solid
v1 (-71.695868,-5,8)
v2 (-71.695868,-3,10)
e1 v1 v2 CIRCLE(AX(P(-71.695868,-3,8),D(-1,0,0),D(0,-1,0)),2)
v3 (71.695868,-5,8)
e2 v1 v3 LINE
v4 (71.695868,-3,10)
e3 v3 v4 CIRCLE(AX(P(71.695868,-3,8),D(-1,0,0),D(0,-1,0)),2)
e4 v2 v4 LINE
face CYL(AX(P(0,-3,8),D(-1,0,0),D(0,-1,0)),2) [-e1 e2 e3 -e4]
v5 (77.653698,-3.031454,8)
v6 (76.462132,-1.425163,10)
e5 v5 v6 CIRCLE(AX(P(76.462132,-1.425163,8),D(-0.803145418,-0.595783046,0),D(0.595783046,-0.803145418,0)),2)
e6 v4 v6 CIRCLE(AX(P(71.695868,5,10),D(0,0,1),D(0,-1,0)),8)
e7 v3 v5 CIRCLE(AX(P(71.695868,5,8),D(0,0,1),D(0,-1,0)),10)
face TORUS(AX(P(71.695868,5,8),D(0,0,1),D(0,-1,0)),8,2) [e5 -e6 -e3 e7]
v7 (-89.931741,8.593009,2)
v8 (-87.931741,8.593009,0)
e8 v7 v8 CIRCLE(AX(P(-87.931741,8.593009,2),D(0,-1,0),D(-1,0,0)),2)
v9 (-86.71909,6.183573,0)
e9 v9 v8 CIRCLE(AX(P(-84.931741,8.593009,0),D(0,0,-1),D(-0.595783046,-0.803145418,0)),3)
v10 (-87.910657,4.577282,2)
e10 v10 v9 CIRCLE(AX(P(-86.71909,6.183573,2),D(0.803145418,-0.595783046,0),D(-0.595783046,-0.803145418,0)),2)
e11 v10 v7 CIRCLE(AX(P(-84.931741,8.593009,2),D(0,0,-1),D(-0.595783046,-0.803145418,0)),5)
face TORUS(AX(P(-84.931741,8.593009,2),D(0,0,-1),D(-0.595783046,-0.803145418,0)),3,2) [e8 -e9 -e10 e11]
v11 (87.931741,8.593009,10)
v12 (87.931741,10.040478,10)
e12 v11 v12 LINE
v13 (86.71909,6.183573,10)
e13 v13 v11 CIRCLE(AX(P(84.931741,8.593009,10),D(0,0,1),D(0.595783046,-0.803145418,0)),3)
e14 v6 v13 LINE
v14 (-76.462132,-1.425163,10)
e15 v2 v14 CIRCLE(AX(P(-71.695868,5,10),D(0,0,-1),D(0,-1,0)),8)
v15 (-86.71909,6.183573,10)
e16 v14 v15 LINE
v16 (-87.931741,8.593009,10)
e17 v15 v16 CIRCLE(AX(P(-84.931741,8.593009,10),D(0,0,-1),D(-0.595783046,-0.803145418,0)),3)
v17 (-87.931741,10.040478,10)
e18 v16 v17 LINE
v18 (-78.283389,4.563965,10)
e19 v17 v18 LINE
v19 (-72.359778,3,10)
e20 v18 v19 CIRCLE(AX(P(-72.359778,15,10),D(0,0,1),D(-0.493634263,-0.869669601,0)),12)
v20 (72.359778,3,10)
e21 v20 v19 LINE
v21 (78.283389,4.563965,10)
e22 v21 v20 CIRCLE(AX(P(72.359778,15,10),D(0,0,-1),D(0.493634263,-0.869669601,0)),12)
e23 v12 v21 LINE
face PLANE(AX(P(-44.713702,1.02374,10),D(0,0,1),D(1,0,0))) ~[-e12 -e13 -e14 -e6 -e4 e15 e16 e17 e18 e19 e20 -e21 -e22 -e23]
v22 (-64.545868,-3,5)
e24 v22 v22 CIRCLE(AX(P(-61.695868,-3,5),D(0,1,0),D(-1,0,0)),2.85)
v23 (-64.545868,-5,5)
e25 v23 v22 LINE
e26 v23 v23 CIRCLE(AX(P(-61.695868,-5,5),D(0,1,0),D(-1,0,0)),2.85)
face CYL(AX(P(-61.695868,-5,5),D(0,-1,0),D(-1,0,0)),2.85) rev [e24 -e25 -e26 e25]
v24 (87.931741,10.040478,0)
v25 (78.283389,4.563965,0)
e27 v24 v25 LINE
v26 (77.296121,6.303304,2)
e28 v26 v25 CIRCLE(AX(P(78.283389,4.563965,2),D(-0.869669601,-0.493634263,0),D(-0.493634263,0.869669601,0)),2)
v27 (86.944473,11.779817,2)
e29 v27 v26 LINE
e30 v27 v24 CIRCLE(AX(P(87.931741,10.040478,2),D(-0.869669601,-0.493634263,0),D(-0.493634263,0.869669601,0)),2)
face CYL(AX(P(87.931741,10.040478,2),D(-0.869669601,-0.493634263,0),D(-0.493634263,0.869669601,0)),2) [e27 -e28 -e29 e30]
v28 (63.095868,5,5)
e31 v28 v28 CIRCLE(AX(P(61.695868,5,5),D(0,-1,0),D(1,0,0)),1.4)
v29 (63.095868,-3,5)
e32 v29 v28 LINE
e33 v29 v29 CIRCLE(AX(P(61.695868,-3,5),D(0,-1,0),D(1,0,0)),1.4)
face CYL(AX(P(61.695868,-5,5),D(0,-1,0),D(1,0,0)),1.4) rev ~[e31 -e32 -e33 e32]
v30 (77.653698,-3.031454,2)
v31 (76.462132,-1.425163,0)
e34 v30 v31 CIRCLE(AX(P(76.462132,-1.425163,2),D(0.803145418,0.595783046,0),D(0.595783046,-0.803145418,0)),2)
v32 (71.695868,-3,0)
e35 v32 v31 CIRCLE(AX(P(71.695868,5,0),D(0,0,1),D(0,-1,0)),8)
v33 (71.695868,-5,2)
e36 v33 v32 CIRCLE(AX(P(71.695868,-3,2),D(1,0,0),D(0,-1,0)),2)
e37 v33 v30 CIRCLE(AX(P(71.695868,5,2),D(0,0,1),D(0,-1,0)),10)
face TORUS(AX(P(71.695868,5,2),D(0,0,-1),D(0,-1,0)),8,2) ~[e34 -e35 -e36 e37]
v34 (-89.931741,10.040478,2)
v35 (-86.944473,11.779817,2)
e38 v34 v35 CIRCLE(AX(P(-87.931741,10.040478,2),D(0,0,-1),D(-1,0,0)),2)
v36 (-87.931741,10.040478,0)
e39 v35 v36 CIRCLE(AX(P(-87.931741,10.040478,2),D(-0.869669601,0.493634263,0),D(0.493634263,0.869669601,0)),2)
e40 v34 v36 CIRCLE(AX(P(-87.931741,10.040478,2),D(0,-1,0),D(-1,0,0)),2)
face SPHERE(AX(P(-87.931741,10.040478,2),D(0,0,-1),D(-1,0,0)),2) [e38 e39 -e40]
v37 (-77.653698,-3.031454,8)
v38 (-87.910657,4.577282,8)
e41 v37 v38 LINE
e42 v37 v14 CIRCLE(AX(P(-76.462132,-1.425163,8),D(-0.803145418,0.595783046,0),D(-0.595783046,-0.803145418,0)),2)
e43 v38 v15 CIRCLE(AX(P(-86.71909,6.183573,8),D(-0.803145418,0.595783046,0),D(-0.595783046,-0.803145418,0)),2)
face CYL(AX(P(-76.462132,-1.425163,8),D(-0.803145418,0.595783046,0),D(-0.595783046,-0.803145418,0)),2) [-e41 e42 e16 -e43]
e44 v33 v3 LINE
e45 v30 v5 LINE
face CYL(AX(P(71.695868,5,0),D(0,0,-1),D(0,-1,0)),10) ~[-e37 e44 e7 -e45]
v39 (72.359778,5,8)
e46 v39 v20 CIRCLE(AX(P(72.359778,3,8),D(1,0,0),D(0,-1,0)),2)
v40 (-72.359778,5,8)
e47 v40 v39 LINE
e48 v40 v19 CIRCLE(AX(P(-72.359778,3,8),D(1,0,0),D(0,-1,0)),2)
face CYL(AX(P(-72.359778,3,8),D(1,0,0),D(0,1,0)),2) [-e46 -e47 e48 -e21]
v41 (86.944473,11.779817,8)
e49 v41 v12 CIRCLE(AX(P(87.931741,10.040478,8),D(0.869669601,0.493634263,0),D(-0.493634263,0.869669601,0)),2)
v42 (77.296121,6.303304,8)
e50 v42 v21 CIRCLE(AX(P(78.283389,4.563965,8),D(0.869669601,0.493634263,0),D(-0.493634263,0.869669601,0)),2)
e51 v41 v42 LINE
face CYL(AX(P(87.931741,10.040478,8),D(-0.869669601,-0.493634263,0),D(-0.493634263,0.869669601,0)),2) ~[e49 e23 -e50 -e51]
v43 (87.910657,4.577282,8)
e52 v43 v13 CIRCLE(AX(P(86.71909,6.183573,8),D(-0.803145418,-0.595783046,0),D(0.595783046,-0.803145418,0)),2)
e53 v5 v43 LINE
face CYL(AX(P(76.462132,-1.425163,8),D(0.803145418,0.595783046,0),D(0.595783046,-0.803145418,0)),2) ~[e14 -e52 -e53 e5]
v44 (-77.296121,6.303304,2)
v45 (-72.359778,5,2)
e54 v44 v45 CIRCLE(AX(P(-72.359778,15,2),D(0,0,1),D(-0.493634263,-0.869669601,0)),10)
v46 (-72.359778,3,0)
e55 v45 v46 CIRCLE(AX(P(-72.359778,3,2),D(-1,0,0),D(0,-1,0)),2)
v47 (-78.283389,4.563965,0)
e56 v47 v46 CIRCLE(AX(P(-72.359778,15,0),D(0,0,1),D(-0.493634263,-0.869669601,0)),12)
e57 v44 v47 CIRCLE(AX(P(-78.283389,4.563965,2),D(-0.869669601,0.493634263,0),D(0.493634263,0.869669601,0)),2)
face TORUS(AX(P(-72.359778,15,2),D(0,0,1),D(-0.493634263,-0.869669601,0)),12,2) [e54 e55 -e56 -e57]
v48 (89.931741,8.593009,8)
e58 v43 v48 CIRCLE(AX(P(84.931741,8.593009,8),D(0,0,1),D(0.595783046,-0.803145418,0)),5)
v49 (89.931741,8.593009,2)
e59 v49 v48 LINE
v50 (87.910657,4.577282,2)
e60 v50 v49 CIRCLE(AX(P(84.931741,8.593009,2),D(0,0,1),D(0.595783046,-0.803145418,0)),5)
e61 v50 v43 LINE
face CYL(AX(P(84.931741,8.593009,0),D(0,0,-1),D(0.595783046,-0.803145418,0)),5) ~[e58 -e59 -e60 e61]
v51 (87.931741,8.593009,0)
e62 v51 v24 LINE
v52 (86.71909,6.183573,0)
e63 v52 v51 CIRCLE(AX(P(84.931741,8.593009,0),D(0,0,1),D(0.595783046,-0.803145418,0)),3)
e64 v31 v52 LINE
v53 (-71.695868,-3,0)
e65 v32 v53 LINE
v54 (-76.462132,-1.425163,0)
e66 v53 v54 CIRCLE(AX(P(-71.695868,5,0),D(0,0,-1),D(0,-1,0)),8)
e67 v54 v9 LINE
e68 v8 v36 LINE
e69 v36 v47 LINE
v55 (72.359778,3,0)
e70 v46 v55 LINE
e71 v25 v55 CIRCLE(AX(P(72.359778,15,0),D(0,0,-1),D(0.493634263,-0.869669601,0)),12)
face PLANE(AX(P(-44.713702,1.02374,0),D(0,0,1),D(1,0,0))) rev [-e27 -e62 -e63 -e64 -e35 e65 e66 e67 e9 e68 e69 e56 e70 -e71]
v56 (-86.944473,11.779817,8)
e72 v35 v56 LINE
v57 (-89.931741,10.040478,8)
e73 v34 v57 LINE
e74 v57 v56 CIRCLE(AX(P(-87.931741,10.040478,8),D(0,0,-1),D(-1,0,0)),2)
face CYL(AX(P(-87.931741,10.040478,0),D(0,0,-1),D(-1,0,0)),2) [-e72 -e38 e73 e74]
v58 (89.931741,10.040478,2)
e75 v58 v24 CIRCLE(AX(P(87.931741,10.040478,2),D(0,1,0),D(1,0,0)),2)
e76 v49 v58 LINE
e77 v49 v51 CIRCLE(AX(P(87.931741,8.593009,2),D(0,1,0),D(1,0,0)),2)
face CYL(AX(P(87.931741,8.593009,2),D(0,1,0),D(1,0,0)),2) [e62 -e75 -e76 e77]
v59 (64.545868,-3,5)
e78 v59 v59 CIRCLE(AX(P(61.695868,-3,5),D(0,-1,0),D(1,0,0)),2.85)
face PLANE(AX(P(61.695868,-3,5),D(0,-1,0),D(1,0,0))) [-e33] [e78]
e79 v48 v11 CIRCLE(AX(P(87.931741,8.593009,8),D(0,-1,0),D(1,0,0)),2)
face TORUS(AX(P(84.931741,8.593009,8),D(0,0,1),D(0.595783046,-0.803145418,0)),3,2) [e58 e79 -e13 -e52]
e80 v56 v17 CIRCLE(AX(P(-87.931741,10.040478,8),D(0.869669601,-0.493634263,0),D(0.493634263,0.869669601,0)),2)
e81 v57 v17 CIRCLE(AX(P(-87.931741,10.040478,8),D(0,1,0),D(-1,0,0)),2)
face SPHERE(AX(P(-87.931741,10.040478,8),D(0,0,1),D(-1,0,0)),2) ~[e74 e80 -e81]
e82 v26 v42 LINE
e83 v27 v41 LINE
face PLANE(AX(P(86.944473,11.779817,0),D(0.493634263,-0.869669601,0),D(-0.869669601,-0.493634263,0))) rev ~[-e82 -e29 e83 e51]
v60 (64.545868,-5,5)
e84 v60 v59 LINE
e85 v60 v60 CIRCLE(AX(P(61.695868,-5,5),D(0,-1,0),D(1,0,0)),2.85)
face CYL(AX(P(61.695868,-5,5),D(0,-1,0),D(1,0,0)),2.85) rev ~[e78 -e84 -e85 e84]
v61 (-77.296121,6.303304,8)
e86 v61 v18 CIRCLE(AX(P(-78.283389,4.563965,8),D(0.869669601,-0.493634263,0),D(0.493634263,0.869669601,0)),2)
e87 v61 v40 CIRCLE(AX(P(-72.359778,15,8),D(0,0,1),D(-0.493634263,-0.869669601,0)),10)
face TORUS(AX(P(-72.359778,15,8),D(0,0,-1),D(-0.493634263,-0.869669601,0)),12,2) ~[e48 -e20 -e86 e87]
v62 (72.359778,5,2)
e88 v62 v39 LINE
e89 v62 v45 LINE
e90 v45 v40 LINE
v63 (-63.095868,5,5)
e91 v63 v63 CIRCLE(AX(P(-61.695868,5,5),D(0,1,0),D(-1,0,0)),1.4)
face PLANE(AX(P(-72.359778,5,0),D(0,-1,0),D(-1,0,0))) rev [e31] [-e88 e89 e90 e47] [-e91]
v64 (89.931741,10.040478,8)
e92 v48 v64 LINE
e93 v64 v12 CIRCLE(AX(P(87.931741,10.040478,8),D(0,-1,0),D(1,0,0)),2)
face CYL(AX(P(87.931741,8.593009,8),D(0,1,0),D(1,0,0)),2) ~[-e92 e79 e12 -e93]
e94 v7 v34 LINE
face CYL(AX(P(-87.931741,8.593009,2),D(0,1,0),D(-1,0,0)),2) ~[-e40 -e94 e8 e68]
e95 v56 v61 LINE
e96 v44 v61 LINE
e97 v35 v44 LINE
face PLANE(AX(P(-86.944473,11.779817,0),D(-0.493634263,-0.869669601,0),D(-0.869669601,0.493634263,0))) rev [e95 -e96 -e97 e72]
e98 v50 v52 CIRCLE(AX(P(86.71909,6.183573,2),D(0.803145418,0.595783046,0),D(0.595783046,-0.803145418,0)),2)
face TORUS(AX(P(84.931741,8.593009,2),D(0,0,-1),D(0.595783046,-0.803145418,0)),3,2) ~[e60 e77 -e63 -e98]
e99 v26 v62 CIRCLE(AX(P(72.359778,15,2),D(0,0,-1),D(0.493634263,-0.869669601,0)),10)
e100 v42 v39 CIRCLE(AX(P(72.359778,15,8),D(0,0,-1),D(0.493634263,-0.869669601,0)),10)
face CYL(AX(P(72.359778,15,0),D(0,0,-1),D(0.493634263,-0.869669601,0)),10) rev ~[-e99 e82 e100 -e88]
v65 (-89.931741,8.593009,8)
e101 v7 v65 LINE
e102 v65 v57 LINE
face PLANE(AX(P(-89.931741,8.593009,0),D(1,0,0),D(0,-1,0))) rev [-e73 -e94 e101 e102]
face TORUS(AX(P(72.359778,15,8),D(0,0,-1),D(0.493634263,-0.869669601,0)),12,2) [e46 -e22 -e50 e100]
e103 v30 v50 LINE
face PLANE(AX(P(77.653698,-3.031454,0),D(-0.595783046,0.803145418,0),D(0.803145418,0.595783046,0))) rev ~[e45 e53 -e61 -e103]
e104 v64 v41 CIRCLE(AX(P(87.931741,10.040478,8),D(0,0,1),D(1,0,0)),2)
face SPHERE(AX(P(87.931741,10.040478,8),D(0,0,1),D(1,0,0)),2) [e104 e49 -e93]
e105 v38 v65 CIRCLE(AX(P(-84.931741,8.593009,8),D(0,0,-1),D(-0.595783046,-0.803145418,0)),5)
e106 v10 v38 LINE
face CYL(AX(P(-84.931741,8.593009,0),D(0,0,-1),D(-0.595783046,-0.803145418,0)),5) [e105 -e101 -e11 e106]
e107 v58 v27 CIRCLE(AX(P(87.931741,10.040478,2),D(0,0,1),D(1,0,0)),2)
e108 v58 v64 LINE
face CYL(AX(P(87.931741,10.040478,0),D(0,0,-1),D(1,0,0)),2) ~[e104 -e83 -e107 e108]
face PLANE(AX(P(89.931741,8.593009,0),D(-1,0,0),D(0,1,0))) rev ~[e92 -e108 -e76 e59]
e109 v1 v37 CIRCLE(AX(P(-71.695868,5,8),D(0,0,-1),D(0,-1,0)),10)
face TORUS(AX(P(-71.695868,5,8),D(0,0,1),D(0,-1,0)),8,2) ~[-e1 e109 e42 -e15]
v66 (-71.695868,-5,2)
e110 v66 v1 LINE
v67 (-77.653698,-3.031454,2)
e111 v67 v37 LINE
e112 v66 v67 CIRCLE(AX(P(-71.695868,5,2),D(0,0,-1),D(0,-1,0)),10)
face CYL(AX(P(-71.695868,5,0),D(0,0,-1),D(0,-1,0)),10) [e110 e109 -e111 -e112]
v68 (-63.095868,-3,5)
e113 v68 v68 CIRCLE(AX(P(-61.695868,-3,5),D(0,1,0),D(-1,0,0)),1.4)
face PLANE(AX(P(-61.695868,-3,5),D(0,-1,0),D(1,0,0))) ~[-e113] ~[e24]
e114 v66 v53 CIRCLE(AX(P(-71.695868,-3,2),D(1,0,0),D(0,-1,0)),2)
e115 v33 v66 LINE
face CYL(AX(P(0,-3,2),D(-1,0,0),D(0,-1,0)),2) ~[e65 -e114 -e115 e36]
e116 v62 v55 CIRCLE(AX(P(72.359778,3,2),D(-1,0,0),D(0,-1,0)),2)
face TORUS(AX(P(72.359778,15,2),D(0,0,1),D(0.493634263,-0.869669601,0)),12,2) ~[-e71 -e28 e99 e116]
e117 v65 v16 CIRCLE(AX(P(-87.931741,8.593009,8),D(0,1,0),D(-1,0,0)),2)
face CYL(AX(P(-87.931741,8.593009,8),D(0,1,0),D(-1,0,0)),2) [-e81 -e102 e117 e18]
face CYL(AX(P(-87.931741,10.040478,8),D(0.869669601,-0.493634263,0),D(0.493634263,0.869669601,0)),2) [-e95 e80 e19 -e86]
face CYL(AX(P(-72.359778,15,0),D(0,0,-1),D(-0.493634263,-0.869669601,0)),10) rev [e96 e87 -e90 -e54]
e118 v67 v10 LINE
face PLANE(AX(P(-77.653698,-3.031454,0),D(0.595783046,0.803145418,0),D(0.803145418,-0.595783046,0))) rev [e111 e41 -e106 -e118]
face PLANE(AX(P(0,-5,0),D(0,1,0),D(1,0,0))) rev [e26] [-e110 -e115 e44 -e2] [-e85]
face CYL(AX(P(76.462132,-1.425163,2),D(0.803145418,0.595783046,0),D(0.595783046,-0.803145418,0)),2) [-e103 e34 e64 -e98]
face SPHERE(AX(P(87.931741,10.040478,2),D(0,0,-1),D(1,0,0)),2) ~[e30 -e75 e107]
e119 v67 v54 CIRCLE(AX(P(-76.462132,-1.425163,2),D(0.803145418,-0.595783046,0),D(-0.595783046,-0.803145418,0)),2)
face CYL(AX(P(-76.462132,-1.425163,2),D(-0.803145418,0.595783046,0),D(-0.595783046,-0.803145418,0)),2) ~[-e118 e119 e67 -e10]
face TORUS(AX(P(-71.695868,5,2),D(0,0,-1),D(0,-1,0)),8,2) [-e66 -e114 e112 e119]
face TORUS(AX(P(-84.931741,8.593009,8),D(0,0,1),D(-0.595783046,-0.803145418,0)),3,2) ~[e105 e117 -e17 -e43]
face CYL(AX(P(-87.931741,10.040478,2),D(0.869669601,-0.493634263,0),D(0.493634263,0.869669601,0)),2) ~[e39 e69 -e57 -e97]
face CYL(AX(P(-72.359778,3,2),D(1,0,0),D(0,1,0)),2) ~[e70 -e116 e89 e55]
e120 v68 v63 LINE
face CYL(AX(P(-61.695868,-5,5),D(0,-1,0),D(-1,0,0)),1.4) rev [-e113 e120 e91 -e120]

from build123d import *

# Parameters (mm, degrees)
F1_DEPTH = 10
F2_R     = 2
F3_R     = 1.4
F4_DEPTH = 11
F3_R_2   = 2.85
F5_DEPTH = 2


with BuildPart() as f1:
    # F0 (on Top) → F1 (new body)
    with BuildSketch(Plane.XY):
        with BuildLine():
            ThreePointArc((77.2961207269, 6.3033039919), (74.9125256302, 5.3313144616), (72.3597780987, 5))
            Line((72.3597780987, 5), (0, 5))
            Line((0, 5), (0, -5))
            Line((0, -5), (71.6958680115, -5))
            ThreePointArc((71.6958680115, -5), (74.8331804116, -4.495118267), (77.6536984673, -3.0314541808))
            Line((77.6536984673, -3.0314541808), (87.9106565848, 4.5772821801))
            ThreePointArc((87.9106565848, 4.5772821801), (89.3979800506, 6.3451854495), (89.9317413568, 8.5930092705))
            Line((89.9317413568, 8.5930092705), (89.9317413568, 10.0404781398))
            ThreePointArc((89.9317413568, 10.0404781398), (88.9380869607, 11.7688497797), (86.9444728312, 11.7798173414))
            Line((86.9444728312, 11.7798173414), (77.2961207269, 6.3033039919))
        make_face()
    extrude(amount=F1_DEPTH)

    # F2
    f2_edges = [f1.edges().sort_by_distance(p)[0] for p in [
        (35.847934, -5, 10),
        (35.847934, -5, 0),
    ]]
    fillet(f2_edges, radius=F2_R)

    # F3 (on face) → F4 (cut)
    with BuildSketch(Plane.XZ.offset(5)):
        with Locations((61.6958680115, 5)):
            Circle(F3_R)
    extrude(amount=-F4_DEPTH, mode=Mode.SUBTRACT)

    # F3 (on face) → F5 (cut)
    with BuildSketch(Plane.XZ.offset(5)):
        with Locations((61.6958680115, 5)):
            Circle(F3_R_2)
        with Locations((61.6958680115, 5)):
            Circle(F3_R, mode=Mode.SUBTRACT)
    extrude(amount=-F5_DEPTH, mode=Mode.SUBTRACT)

    # F6: F1 across plane


with BuildPart() as f1_1:
    add(f1.part)
    add(f1.part.mirror(Plane.YZ))


solid = f1_1.part
